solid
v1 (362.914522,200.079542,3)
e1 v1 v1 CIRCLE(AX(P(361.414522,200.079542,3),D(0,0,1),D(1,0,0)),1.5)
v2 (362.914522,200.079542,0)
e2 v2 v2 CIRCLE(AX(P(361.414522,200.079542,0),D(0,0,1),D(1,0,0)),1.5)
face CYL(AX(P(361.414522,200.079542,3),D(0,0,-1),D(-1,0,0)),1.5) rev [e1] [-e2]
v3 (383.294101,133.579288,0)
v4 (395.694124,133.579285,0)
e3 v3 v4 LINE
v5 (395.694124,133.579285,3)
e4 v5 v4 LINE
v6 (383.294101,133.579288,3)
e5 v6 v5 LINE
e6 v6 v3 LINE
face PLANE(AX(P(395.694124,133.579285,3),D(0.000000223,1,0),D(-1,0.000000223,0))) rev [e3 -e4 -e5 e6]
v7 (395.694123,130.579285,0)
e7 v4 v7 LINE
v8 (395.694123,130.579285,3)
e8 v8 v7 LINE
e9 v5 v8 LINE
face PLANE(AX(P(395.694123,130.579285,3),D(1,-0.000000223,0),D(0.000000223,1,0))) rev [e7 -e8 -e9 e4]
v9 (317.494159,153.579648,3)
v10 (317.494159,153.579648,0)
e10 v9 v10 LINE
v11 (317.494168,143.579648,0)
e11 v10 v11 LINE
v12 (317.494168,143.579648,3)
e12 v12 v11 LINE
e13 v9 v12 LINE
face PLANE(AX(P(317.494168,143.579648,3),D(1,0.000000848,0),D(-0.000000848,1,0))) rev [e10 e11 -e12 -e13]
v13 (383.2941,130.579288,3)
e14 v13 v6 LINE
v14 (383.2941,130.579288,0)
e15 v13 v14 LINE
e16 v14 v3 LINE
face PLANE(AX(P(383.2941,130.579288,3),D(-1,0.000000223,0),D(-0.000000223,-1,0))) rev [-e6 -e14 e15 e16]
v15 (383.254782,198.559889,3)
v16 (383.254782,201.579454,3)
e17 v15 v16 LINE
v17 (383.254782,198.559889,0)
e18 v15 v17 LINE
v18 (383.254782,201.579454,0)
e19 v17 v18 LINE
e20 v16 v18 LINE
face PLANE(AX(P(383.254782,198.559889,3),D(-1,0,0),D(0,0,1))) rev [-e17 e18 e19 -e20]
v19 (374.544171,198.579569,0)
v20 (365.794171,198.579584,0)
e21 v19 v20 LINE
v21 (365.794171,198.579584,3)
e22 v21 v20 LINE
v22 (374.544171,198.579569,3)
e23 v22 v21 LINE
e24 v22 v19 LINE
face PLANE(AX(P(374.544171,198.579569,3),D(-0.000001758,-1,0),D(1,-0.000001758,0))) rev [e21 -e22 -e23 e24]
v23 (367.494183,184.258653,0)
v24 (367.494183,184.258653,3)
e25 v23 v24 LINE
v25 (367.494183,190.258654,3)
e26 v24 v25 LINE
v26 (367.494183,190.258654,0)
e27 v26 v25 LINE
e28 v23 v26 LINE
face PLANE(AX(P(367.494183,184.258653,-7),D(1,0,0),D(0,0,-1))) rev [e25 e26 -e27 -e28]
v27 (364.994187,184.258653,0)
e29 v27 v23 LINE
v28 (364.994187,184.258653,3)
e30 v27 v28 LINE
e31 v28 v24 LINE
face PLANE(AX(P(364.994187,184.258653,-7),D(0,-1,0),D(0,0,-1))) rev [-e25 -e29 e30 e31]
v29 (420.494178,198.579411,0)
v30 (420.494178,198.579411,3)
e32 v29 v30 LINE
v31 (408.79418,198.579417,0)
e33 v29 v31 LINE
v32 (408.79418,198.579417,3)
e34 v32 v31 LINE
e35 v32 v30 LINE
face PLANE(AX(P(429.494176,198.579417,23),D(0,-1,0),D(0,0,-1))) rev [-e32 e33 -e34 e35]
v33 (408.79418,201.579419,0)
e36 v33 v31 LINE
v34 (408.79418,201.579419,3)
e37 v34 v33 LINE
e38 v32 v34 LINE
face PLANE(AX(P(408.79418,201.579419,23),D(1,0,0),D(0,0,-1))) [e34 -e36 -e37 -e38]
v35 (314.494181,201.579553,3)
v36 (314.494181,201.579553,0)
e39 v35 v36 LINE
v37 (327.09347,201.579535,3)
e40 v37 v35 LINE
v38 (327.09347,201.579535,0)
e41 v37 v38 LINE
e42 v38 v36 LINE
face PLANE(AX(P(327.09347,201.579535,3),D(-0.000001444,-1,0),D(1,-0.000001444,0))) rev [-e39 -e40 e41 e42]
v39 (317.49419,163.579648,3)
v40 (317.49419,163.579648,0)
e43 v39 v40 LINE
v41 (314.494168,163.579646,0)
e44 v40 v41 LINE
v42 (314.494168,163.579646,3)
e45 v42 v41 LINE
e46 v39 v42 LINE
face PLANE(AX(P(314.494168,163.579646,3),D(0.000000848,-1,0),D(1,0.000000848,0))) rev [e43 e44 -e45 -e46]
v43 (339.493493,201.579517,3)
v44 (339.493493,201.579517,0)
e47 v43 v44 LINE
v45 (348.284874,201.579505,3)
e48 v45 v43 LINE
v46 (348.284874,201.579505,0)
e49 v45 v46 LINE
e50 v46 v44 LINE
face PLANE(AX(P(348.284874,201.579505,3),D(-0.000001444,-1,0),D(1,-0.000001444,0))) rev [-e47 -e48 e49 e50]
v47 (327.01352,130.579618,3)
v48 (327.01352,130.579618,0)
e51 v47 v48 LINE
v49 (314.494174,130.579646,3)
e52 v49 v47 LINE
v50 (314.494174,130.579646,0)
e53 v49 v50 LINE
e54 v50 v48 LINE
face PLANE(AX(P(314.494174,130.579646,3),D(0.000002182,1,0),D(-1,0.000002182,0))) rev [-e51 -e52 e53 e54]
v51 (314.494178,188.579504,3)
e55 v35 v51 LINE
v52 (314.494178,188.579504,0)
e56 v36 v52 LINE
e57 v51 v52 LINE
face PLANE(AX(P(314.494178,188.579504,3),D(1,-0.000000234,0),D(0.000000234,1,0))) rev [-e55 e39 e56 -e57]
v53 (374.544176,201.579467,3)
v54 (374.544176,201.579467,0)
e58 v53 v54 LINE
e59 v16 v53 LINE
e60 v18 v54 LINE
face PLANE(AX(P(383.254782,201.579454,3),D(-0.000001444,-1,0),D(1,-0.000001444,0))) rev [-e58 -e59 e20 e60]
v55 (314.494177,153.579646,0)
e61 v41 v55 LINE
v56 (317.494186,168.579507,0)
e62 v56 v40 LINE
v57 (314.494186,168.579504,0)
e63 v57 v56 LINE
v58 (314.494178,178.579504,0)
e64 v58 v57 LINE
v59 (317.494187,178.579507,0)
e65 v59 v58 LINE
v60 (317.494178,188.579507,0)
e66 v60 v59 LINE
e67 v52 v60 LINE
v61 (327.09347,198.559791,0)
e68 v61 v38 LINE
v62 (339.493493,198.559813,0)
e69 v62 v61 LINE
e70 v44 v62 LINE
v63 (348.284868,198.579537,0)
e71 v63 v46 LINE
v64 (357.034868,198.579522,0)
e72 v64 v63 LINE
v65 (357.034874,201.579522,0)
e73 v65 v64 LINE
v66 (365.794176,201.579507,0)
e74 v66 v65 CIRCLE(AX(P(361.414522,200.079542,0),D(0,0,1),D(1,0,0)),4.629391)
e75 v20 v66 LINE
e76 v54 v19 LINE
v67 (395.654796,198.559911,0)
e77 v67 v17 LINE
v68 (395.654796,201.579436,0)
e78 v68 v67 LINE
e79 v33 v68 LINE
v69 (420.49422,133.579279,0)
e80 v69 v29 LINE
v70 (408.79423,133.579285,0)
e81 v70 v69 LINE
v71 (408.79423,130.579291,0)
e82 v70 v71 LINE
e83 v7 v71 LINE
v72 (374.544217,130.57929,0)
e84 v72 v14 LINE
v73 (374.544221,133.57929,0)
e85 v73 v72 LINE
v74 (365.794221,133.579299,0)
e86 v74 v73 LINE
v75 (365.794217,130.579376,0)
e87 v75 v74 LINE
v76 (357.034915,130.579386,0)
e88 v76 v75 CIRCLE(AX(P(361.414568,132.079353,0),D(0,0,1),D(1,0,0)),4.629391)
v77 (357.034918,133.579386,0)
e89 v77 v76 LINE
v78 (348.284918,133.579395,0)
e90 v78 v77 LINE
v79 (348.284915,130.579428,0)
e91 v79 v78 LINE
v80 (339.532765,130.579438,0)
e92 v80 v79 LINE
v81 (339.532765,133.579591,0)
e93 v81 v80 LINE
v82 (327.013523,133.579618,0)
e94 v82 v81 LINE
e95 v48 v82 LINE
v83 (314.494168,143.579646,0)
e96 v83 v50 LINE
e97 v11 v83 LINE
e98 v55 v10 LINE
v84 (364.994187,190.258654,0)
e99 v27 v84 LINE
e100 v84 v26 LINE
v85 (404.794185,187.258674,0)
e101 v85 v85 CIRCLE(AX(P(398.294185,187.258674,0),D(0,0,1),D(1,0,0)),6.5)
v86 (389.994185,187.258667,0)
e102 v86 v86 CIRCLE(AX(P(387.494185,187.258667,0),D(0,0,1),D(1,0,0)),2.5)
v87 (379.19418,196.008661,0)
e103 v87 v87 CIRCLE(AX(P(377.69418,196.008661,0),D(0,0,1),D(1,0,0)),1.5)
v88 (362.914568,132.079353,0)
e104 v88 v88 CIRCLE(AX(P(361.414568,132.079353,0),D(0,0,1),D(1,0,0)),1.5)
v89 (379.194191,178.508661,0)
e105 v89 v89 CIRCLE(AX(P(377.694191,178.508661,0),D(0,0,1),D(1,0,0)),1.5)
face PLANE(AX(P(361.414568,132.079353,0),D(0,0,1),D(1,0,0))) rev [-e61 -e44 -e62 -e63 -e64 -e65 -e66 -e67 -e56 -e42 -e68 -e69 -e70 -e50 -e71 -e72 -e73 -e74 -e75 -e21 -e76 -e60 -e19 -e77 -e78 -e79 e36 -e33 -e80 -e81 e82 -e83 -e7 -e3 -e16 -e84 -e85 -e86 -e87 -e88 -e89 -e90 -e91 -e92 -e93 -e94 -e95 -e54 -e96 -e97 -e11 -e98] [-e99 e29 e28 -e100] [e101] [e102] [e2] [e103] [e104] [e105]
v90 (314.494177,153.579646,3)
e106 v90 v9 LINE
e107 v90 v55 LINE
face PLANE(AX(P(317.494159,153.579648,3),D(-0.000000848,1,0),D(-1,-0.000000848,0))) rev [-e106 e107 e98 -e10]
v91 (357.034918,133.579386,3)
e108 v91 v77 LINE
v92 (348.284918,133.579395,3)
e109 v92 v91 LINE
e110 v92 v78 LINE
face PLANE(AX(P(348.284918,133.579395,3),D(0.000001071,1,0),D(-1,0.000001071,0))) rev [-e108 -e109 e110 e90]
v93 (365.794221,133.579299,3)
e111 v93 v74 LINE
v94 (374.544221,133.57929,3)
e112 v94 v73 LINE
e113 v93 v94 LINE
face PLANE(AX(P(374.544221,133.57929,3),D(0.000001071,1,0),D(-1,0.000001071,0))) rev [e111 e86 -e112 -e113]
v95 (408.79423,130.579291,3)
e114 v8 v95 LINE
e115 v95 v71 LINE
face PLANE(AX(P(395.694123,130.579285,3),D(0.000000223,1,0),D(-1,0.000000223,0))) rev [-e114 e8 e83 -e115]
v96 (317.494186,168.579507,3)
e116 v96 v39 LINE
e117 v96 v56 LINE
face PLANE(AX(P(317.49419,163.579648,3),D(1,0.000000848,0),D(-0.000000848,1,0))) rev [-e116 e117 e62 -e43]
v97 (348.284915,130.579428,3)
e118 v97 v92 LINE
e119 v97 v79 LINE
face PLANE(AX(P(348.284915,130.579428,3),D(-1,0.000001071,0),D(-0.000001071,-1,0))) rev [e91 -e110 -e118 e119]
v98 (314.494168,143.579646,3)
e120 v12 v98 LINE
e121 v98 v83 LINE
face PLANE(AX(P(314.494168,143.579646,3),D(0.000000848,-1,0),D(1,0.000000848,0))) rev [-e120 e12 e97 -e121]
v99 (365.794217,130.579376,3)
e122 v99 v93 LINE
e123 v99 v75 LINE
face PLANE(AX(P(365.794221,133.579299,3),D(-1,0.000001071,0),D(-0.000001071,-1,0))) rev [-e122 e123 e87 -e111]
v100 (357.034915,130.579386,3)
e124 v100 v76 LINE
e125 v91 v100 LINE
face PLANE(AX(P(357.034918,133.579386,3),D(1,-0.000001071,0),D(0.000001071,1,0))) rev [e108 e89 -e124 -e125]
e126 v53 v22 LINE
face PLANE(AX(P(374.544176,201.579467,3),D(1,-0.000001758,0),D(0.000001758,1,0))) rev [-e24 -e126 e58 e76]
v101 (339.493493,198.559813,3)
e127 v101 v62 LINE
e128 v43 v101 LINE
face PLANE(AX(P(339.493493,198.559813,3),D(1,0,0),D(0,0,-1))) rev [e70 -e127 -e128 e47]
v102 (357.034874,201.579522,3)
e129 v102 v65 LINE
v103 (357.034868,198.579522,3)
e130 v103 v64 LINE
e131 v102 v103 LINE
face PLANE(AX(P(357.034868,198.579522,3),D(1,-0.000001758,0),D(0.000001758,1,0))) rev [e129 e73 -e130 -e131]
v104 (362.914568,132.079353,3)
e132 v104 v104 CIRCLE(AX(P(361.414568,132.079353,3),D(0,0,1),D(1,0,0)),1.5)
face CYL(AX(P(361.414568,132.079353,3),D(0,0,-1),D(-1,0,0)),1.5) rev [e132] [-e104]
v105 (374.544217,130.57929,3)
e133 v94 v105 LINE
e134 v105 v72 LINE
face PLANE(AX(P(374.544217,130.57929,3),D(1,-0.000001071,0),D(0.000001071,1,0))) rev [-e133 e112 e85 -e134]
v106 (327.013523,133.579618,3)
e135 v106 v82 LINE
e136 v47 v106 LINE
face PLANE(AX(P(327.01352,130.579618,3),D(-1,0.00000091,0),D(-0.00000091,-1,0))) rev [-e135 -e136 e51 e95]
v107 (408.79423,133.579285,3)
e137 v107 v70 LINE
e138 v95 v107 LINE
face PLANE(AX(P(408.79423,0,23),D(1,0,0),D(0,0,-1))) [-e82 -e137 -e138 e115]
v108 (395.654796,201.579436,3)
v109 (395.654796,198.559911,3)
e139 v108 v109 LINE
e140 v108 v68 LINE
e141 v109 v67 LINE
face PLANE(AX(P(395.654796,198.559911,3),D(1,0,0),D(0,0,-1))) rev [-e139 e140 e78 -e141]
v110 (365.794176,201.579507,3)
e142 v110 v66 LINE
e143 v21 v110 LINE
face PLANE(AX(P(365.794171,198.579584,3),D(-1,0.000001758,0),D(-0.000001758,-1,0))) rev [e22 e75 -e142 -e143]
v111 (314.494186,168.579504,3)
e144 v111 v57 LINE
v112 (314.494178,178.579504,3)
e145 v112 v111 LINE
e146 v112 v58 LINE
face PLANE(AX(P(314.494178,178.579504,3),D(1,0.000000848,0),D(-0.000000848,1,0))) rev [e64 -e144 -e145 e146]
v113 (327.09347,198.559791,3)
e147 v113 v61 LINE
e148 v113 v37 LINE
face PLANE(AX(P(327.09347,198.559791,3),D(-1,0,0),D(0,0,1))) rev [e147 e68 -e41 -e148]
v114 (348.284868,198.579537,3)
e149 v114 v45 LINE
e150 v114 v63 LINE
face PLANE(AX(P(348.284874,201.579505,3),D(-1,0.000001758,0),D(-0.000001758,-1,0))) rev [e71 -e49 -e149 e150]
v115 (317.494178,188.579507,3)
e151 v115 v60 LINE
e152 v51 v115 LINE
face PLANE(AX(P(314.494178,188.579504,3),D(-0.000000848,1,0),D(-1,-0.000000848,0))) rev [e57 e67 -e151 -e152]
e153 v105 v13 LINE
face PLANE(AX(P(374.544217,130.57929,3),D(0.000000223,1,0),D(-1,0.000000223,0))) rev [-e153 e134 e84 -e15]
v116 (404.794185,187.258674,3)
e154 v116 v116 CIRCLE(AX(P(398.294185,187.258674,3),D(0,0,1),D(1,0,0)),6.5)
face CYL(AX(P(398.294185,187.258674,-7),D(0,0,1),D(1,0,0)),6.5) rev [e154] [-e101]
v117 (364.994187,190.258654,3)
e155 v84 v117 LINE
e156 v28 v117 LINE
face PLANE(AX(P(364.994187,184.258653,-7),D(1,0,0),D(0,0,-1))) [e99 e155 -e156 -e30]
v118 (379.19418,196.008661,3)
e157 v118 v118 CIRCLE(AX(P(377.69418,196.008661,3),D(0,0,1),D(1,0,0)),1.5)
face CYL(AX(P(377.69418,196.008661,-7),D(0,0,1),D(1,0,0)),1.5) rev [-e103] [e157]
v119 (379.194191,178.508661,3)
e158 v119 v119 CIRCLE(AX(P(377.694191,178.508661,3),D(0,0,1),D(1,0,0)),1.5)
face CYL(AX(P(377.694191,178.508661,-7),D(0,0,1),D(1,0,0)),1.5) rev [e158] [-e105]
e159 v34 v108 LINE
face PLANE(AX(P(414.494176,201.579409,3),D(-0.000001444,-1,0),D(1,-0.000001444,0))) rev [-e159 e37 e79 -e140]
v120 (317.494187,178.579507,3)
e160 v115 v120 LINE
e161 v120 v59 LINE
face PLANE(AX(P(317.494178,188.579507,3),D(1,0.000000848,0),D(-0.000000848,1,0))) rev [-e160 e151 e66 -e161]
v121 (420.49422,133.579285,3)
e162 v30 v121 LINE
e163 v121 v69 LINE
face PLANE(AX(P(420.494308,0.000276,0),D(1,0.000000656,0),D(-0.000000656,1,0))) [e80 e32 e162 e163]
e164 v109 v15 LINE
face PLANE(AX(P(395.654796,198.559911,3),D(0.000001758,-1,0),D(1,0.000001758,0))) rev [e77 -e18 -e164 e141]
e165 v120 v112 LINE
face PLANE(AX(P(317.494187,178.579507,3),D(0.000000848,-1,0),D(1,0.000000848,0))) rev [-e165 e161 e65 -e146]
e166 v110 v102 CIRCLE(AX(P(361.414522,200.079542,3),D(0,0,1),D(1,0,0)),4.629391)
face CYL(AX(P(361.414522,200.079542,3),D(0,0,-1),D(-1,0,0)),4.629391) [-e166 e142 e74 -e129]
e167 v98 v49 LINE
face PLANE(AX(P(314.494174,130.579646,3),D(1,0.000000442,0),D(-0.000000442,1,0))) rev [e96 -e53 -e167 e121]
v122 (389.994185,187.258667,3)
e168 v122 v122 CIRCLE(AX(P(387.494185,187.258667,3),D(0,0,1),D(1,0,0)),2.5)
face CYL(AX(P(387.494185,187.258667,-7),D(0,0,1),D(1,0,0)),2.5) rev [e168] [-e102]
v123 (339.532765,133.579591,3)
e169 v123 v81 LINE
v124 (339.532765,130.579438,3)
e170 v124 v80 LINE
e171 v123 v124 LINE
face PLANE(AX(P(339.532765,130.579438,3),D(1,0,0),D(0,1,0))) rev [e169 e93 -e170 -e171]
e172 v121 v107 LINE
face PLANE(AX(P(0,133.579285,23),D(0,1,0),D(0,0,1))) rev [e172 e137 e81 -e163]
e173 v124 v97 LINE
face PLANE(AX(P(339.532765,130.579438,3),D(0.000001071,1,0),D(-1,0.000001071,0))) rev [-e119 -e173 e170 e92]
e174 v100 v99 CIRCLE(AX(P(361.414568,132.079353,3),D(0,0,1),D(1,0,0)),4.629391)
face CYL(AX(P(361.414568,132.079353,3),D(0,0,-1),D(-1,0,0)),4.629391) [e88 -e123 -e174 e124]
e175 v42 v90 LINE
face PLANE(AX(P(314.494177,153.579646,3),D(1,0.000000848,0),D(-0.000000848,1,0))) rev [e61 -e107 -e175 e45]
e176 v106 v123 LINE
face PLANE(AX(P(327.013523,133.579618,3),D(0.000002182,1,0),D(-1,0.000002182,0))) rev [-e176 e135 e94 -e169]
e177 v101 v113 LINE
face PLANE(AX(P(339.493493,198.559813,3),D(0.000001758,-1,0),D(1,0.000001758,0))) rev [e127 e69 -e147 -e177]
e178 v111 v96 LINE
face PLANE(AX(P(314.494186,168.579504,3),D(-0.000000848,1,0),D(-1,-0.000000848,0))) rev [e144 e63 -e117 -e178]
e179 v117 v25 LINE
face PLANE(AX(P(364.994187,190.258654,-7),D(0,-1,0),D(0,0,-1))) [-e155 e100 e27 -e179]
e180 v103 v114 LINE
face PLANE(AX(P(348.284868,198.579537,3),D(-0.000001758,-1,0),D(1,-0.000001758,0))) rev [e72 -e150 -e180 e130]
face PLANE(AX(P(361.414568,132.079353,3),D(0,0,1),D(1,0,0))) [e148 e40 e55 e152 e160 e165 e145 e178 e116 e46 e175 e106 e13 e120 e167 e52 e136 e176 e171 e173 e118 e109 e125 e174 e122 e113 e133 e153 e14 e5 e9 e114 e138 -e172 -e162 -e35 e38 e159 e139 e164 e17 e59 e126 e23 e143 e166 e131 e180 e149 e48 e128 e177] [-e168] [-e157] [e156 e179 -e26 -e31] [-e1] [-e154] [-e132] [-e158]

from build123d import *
from OCP.BRepAlgoAPI import BRepAlgoAPI_Cut
from OCP.TopTools import TopTools_ListOfShape

# Parameters (mm, degrees)
CROQUIS1_R              = 1.500000001
SALIENTE_EXTRUIR1_DEPTH = 3
CROQUIS4_W              = 3
CROQUIS4_H              = 71.0001277
SALIENTE_EXTRUIR2_DEPTH = 15
CROQUIS5_R              = 6.5
CROQUIS5_R_2            = 1.5
CROQUIS5_R_3            = 2.5
CROQUIS5_W              = 2.499996062
CROQUIS5_H              = 6.000001641
CORTAR_EXTRUIR1_DEPTH   = 10
CORTAR_EXTRUIR3_START   = -4
CORTAR_EXTRUIR3_DEPTH   = 5
CROQUIS7_W              = 3
CROQUIS7_H              = 65.000131742
CORTAR_EXTRUIR4_DEPTH   = 9


with BuildPart() as part:
    # Croquis1 → Saliente-Extruir1 (new body)
    with BuildSketch(Plane.XY):
        with BuildLine():
            Line((314.494178041, 188.579504075), (317.494178043, 188.579506619))
            Line((317.494178043, 188.579506619), (317.494186524, 178.579506615))
            Line((317.494186524, 178.579506615), (314.494177731, 178.579504071))
            Line((314.494177731, 178.579504071), (314.494186212, 168.579504067))
            Line((314.494186212, 168.579504067), (317.494186214, 168.579506611))
            Line((317.494186214, 168.579506611), (317.494190454, 163.579648323))
            Line((317.494190454, 163.579648323), (314.494168474, 163.579645778))
            Line((314.494168474, 163.579645778), (314.494176956, 153.579645774))
            Line((314.494176956, 153.579645774), (317.494159374, 153.579648318))
            Line((317.494159374, 153.579648318), (317.494167855, 143.579648314))
            Line((317.494167855, 143.579648314), (314.494167854, 143.57964577))
            Line((314.494167854, 143.57964577), (314.494173605, 130.579645765))
            Line((314.494173605, 130.579645765), (327.013519861, 130.579618443))
            Line((327.013519861, 130.579618443), (327.013522591, 133.579618444))
            Line((327.013522591, 133.579618444), (339.532765197, 133.579591123))
            Line((339.532765197, 133.579591123), (339.532765197, 130.57943755))
            Line((339.532765197, 130.57943755), (348.284914925, 130.579428178))
            Line((348.284914925, 130.579428178), (348.284918137, 133.579395242))
            Line((348.284918137, 133.579395242), (357.034918141, 133.579385871))
            Line((357.034918141, 133.579385871), (357.034914928, 130.57938587))
            ThreePointArc((357.034914928, 130.57938587), (361.414562849, 127.449962294), (365.794217472, 130.57937649))
            Line((365.794217472, 130.57937649), (365.794220685, 133.579299126))
            Line((365.794220685, 133.579299126), (374.544220688, 133.579289756))
            Line((374.544220688, 133.579289756), (374.544217476, 130.579290106))
            Line((374.544217476, 130.579290106), (383.294100119, 130.579288157))
            Line((383.294100119, 130.579288157), (383.294100787, 133.579288158))
            Line((383.294100787, 133.579288158), (395.694123645, 133.579285396))
            Line((395.694123645, 133.579285396), (395.694122977, 130.579285394))
            Line((395.694122977, 130.579285394), (414.49422245, 130.579281206))
            Line((414.49422245, 130.579281206), (414.494175849, 201.579408906))
            Line((414.494175849, 201.579408906), (395.654796079, 201.579436111))
            Line((395.654796079, 201.579436111), (395.654796079, 198.559911251))
            Line((395.654796079, 198.559911251), (383.254781657, 198.559889448))
            Line((383.254781657, 198.559889448), (383.254781657, 201.579454018))
            Line((383.254781657, 201.579454018), (374.544176149, 201.579466597))
            Line((374.544176149, 201.579466597), (374.544170874, 198.579568646))
            Line((374.544170874, 198.579568646), (365.794170871, 198.579584031))
            Line((365.794170871, 198.579584031), (365.794176145, 201.579506668))
            ThreePointArc((365.794176145, 201.579506668), (361.414530376, 204.708933254), (357.034873601, 201.579522069))
            Line((357.034873601, 201.579522069), (357.034868326, 198.579522068))
            Line((357.034868326, 198.579522068), (348.284868323, 198.579537453))
            Line((348.284868323, 198.579537453), (348.284873598, 201.579504517))
            Line((348.284873598, 201.579504517), (339.493492813, 201.579517212))
            Line((339.493492813, 201.579517212), (339.493492813, 198.559812504))
            Line((339.493492813, 198.559812504), (327.093469951, 198.559790701))
            Line((327.093469951, 198.559790701), (327.093469951, 201.579535118))
            Line((327.093469951, 201.579535118), (314.494181082, 201.579553313))
            Line((314.494181082, 201.579553313), (314.494178041, 188.579504075))
        make_face()
        with Locations((361.414522236, 200.079542161)):
            Circle(CROQUIS1_R, mode=Mode.SUBTRACT)
        with Locations((361.414567806, 132.079353387)):
            Circle(CROQUIS1_R, mode=Mode.SUBTRACT)
    extrude(amount=SALIENTE_EXTRUIR1_DEPTH)

    # Croquis4 → Saliente-Extruir2 (add)
    with BuildSketch(Plane(origin=(414.494308155, 0.000272052, 0), x_dir=(0, 0, -1), z_dir=(0.9999999999997846, 6.563478556519826e-07, 0))):
        with Locations((-1.5, 166.079073004)):
            Rectangle(CROQUIS4_W, CROQUIS4_H)
    extrude(amount=SALIENTE_EXTRUIR2_DEPTH)

    # Croquis5 → Cortar-Extruir1 (cut)
    with BuildSketch(Plane.XY.offset(3)):
        with Locations((398.294185249, 187.258674364)):
            Circle(CROQUIS5_R)
        with Locations((377.694190992, 178.508660843)):
            Circle(CROQUIS5_R_2)
        with Locations((377.694179506, 196.008660843)):
            Circle(CROQUIS5_R_2)
        with Locations((387.494185249, 187.258667276)):
            Circle(CROQUIS5_R_3)
        with Locations((366.244185249, 187.258653329)):
            Rectangle(CROQUIS5_W, CROQUIS5_H)
    extrude(amount=-CORTAR_EXTRUIR1_DEPTH, mode=Mode.SUBTRACT)

    # Cortar-Extruir3: read off the stored shape, not the designer's step
    # Cortar-Extruir3 outline → Cortar-Extruir3 (cut)
    with BuildSketch(Plane(origin=(0, 0, 0), x_dir=(-1, 0, 0), z_dir=(0, 0, -1)).offset(CORTAR_EXTRUIR3_START)):
        Polygon((-429.494175849, 201.579418751), (-429.494177818, 198.579417138), (-408.794180476, 198.579417138), (-408.794180476, 201.579418751), (-414.494175849, 201.579408906), align=None)
        Polygon((-408.79422983, 133.579285396), (-429.49422245, 133.579285396), (-429.49422245, 130.579291051), (-414.49422245, 130.579281206), (-408.79422983, 130.579282476), align=None)
    extrude(amount=CORTAR_EXTRUIR3_DEPTH, mode=Mode.SUBTRACT)


with BuildPart() as cortar_extruir4_tool:
    # Croquis7 → Cortar-Extruir4 (new body)
    with BuildSketch(Plane(origin=(429.494308155, 0.000281898, 0), x_dir=(0, 0, -1), z_dir=(0.9999999999997846, 6.563478556519826e-07, 0))):
        with Locations((-1.5, 166.079069369)):
            Rectangle(CROQUIS7_W, CROQUIS7_H)
    extrude(amount=-CORTAR_EXTRUIR4_DEPTH)


with BuildPart() as part_1:
    add(part.part)

    # Cortar-Extruir4: cut by cortar_extruir4_tool, with a tolerance
    cortar_extruir4_stock = TopTools_ListOfShape()
    cortar_extruir4_stock.Append(part_1.part.wrapped)
    cortar_extruir4_tools = TopTools_ListOfShape()
    cortar_extruir4_tools.Append(cortar_extruir4_tool.part.wrapped)
    cortar_extruir4_cut = BRepAlgoAPI_Cut()
    cortar_extruir4_cut.SetArguments(cortar_extruir4_stock)
    cortar_extruir4_cut.SetTools(cortar_extruir4_tools)
    cortar_extruir4_cut.SetFuzzyValue(0.00001)
    cortar_extruir4_cut.Build()
    add(Compound.cast(cortar_extruir4_cut.Shape()).solids(), mode=Mode.REPLACE)


solid = part_1.part
